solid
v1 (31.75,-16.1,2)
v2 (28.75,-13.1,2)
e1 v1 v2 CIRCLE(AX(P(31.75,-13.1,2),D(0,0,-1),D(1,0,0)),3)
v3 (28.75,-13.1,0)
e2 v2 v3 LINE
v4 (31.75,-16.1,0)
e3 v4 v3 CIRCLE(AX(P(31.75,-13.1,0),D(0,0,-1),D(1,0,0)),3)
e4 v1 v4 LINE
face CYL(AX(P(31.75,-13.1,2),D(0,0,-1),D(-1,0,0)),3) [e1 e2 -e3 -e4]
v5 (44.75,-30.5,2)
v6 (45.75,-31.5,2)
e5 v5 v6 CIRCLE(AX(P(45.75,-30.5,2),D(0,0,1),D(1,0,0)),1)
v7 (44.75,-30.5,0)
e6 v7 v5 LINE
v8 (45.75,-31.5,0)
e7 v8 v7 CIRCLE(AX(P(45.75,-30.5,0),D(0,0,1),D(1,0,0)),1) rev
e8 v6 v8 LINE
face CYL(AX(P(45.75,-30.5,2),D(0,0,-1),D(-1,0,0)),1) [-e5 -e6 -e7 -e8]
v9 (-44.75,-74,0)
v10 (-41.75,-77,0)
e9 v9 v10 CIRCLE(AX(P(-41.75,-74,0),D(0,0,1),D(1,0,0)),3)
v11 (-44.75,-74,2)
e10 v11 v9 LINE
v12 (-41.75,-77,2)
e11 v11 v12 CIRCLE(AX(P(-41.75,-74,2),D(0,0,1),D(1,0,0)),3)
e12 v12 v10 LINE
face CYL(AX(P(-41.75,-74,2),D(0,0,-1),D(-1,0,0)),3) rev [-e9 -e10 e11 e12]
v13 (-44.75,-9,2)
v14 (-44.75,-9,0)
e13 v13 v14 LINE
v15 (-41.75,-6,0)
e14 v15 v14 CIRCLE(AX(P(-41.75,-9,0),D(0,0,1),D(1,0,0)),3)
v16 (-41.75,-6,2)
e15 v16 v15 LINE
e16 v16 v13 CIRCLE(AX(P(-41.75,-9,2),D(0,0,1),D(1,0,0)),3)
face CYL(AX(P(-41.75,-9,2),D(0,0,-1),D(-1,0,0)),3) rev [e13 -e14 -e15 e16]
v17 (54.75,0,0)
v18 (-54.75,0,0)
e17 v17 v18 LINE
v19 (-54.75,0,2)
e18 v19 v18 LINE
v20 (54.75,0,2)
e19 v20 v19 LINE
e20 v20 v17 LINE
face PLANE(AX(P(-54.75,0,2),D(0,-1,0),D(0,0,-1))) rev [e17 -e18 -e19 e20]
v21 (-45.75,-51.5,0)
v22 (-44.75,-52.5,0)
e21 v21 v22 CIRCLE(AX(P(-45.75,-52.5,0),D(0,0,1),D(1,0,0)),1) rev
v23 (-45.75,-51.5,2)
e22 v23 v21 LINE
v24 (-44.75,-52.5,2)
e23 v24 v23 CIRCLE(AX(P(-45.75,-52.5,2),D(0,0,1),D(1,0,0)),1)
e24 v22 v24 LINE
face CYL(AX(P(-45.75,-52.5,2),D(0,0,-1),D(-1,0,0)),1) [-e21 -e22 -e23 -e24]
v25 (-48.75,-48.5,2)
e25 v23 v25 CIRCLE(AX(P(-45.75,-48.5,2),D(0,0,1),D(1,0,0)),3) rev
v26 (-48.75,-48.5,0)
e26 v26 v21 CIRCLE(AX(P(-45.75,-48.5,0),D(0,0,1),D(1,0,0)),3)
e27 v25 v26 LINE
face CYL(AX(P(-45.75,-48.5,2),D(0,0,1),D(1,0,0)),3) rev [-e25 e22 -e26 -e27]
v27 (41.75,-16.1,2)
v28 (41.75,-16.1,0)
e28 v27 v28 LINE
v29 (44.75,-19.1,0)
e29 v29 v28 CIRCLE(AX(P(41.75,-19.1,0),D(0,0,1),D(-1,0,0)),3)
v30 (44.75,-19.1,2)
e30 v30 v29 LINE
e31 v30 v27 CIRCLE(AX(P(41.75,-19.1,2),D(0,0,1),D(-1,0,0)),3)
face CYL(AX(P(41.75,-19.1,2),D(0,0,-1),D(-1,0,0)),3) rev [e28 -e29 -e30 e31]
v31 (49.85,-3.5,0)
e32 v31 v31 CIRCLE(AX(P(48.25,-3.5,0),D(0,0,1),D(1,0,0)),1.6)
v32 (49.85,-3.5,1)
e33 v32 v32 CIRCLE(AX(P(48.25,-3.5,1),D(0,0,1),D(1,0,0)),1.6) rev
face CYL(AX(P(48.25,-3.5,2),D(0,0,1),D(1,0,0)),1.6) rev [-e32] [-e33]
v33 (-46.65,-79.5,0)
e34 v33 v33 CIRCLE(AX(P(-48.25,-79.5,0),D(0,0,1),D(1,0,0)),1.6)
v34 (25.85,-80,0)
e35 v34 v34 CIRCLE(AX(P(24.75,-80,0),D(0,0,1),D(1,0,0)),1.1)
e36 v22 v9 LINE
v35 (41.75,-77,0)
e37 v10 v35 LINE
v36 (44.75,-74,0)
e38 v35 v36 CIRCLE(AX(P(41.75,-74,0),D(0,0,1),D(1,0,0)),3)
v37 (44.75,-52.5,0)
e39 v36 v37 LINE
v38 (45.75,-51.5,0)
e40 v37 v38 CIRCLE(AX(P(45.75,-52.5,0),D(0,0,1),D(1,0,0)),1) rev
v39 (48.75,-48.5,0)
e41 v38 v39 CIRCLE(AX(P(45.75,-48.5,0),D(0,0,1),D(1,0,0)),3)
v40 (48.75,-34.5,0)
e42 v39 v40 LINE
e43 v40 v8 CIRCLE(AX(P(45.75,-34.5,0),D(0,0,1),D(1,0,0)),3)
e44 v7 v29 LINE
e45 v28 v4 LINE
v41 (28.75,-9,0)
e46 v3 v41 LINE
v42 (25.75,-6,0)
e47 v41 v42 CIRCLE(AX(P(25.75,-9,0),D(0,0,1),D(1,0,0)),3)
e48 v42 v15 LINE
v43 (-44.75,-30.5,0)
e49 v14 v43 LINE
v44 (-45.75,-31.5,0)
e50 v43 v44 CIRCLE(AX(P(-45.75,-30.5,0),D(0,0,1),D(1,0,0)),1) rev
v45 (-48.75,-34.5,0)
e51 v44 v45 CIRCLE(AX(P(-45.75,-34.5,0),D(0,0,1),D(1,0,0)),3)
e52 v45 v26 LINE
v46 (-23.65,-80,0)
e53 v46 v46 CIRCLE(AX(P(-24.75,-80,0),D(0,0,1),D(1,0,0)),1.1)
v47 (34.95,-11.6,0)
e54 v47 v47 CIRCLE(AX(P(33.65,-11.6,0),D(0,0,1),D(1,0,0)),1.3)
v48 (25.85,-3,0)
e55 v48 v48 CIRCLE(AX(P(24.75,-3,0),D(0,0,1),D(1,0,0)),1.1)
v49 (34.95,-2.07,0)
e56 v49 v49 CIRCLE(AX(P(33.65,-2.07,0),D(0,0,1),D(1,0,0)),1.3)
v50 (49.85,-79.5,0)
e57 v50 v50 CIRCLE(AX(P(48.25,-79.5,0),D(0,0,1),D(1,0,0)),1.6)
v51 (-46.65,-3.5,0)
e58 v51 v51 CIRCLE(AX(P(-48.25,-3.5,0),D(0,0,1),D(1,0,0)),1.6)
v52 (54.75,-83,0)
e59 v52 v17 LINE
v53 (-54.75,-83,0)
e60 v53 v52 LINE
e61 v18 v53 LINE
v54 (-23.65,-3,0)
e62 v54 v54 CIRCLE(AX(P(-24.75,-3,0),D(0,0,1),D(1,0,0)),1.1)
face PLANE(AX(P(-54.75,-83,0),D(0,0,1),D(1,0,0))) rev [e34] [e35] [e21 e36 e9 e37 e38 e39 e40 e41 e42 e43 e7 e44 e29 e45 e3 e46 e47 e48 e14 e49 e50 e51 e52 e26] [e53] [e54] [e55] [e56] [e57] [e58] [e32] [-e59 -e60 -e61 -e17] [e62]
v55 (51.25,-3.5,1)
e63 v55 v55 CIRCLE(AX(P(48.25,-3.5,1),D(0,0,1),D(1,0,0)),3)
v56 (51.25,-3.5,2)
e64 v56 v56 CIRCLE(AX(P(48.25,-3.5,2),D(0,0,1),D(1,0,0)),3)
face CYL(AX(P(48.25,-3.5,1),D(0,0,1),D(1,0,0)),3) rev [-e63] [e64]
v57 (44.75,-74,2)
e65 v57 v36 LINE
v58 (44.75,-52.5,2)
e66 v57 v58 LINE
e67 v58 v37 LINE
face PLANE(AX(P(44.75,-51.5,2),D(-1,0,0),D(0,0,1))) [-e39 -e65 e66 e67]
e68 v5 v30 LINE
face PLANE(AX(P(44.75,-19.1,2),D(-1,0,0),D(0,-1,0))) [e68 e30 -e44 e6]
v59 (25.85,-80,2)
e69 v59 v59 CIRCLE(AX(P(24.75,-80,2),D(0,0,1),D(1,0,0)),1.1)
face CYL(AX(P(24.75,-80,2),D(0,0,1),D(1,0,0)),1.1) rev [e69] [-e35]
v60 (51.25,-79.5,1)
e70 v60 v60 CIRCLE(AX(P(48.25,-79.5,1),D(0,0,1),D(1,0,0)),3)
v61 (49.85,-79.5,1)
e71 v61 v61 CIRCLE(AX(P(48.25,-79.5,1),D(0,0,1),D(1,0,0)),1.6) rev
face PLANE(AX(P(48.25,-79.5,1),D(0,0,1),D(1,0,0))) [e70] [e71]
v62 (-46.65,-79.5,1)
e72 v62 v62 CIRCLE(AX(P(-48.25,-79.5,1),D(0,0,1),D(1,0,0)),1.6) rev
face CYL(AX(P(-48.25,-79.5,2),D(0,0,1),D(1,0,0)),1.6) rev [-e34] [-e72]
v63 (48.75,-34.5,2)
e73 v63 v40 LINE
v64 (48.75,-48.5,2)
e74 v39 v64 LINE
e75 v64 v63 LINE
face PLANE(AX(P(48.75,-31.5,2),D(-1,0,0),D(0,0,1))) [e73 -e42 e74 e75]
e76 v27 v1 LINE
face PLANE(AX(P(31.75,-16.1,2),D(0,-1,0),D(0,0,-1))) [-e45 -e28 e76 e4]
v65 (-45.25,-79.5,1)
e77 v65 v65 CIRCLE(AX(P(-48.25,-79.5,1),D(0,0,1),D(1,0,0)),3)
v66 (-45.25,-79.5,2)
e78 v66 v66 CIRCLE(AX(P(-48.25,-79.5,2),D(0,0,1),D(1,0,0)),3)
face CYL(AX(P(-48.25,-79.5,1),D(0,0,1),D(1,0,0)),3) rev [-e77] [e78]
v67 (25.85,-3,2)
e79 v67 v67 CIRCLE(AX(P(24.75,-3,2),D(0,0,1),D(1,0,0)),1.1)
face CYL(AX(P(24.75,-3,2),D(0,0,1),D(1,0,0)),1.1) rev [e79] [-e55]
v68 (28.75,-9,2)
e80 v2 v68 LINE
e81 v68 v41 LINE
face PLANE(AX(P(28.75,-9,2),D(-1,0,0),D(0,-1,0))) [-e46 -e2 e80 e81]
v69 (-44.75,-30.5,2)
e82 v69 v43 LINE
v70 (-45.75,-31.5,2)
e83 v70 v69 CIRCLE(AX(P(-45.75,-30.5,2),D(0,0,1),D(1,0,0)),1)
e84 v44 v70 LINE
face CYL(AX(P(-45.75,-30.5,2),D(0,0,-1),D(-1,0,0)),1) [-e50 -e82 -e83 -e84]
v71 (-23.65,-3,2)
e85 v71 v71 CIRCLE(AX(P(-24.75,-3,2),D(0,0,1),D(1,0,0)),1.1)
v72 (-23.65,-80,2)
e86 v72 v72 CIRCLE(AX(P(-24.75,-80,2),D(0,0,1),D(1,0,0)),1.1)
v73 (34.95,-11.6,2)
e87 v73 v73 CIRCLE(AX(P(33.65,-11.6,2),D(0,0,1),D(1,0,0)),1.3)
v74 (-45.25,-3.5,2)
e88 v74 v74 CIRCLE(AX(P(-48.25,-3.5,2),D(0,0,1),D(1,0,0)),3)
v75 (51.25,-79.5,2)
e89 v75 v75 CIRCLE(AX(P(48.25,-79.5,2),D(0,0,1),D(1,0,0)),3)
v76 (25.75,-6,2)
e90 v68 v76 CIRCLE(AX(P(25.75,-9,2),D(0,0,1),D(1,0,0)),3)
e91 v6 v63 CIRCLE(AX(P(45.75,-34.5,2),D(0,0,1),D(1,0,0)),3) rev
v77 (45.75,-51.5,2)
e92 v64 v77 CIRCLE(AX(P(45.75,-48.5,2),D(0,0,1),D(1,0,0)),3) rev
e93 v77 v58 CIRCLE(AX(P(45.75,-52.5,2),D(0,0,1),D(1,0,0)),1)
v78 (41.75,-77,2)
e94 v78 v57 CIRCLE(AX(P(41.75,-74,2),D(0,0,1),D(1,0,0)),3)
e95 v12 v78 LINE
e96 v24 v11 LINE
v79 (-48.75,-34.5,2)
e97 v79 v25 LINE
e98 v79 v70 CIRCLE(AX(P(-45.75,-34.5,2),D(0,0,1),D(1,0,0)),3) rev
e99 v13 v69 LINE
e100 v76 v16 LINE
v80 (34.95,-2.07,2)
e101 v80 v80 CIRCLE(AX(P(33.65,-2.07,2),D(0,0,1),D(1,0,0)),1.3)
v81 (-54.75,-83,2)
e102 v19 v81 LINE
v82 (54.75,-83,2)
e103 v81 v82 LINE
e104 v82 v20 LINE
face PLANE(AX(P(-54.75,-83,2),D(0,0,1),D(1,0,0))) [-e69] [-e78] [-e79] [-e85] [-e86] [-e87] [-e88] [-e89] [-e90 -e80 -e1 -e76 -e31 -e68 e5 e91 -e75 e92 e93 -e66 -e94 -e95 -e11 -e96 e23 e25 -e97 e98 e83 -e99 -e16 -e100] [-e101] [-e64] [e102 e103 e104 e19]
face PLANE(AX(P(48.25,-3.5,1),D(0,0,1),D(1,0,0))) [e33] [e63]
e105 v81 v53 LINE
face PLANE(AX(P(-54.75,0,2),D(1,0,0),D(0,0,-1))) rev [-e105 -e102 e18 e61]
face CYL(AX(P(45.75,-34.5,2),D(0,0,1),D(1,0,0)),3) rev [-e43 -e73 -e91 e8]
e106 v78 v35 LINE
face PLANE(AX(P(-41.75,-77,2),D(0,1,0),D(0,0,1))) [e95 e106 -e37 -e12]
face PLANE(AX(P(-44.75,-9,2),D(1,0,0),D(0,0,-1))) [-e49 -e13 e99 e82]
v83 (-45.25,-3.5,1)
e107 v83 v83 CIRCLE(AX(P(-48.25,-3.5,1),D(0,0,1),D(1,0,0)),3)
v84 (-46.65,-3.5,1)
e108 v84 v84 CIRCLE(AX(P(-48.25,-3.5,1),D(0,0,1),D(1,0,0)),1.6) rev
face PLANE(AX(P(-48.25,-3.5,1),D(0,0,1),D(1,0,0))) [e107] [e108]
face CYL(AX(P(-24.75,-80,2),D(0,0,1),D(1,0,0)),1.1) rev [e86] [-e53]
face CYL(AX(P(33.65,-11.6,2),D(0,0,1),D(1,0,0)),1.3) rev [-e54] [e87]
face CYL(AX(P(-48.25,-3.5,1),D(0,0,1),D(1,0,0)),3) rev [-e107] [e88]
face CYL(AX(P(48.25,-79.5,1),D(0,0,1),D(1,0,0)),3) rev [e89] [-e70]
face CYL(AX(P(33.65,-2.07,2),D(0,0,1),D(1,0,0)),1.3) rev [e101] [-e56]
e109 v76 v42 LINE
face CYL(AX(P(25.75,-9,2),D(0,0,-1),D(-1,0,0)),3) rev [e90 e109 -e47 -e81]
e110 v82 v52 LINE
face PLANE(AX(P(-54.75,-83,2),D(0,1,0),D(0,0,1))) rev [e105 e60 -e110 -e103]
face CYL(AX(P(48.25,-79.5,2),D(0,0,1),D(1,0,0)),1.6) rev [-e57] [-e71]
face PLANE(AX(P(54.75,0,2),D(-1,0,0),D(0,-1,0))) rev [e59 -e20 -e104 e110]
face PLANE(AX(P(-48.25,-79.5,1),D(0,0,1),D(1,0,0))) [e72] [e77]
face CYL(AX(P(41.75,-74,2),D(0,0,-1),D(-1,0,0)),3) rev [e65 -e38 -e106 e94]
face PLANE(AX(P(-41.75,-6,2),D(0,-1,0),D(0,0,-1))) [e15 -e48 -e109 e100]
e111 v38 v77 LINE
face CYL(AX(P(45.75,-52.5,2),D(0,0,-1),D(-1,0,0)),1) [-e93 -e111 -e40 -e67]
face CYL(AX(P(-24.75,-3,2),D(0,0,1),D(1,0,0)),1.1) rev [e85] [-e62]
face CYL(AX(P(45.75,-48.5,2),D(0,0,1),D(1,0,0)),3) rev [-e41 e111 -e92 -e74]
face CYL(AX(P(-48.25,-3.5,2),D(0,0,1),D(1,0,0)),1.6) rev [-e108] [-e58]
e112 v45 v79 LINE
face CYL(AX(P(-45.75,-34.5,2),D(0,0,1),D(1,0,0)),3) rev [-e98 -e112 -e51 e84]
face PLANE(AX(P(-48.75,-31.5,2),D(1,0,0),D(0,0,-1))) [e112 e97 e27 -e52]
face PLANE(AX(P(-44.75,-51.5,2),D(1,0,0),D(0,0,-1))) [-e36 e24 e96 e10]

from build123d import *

# Parameters (mm, degrees)
SKETCH1_W                  = 109.5
SKETCH1_H                  = 83
BOSS_EXTRUDE1_DEPTH        = 2
F_3_2_3_2_DIAMETER_HOLE2_D = 3.2
F_2_6_2_6_DIAMETER_HOLE2_D = 2.6
F_2_6_2_6_DIAMETER_HOLE1_D = 2.6
SKETCH9_R                  = 3
CUT_EXTRUDE1_DEPTH         = 1
F_2_2_2_2_DIAMETER_HOLE1_D = 2.2
FILLET1_R                  = 1
FILLET2_R                  = 3


with BuildPart() as part:
    # Sketch1 → Boss-Extrude1 (new body)
    with BuildSketch(Plane.XY):
        with Locations((0, -41.5)):
            Rectangle(SKETCH1_W, SKETCH1_H)
        with BuildLine():
            Line((-44.75, -31.5), (-48.75, -31.5))
            Line((-48.75, -31.5), (-48.75, -51.5))
            Line((-48.75, -51.5), (-44.75, -51.5))
            Line((-44.75, -51.5), (-44.75, -74))
            ThreePointArc((-44.75, -74), (-43.871320344, -76.121320344), (-41.75, -77))
            Line((-41.75, -77), (41.75, -77))
            ThreePointArc((41.75, -77), (43.871320344, -76.121320344), (44.75, -74))
            Line((44.75, -74), (44.75, -51.5))
            Line((44.75, -51.5), (48.75, -51.5))
            Line((48.75, -51.5), (48.75, -41.5))
            Line((48.75, -41.5), (48.75, -31.5))
            Line((48.75, -31.5), (44.75, -31.5))
            Line((44.75, -31.5), (44.75, -19.1))
            ThreePointArc((44.75, -19.1), (43.871320344, -16.978679656), (41.75, -16.1))
            Line((41.75, -16.1), (31.75, -16.1))
            ThreePointArc((31.75, -16.1), (29.628679656, -15.221320344), (28.75, -13.1))
            Line((28.75, -13.1), (28.75, -9))
            ThreePointArc((28.75, -9), (27.871320344, -6.878679656), (25.75, -6))
            Line((25.75, -6), (-41.75, -6))
            ThreePointArc((-41.75, -6), (-43.871320344, -6.878679656), (-44.75, -9))
            Line((-44.75, -9), (-44.75, -31.5))
        make_face(mode=Mode.SUBTRACT)
    extrude(amount=BOSS_EXTRUDE1_DEPTH)

    # Ø3.2 (3.2) Diameter Hole2 (through all)
    with Locations(Plane.XY.offset(2)):
        with Locations((-48.25, -3.5), (-48.25, -79.5), (48.25, -79.5), (48.25, -3.5)):
            Hole(F_3_2_3_2_DIAMETER_HOLE2_D / 2)

    # Ø2.6 (2.6) Diameter Hole2 (through all)
    with Locations(Plane.XY.offset(2)):
        with Locations((33.65, -11.6)):
            Hole(F_2_6_2_6_DIAMETER_HOLE2_D / 2)

    # Ø2.6 (2.6) Diameter Hole1 (through all)
    with Locations(Plane.XY.offset(2)):
        with Locations((33.65, -2.07)):
            Hole(F_2_6_2_6_DIAMETER_HOLE1_D / 2)

    # Sketch9 → Cut-Extrude1 (cut)
    with BuildSketch(Plane.XY.offset(2)):
        with Locations((-48.25, -3.5)):
            Circle(SKETCH9_R)
        with Locations((48.25, -3.5)):
            Circle(SKETCH9_R)
        with Locations((48.25, -79.5)):
            Circle(SKETCH9_R)
        with Locations((-48.25, -79.5)):
            Circle(SKETCH9_R)
    extrude(amount=-CUT_EXTRUDE1_DEPTH, mode=Mode.SUBTRACT)

    # Ø2.2 (2.2) Diameter Hole1 (through all)
    with Locations(Plane.XY.offset(2)):
        with Locations((-24.75, -3), (24.75, -3), (-24.75, -80), (24.75, -80)):
            Hole(F_2_2_2_2_DIAMETER_HOLE1_D / 2)

    # Fillet1
    fillet1_edges = [part.edges().sort_by_distance(p)[0] for p in [
        (-44.75, -31.5, 1),
        (-44.75, -51.5, 1),
        (44.75, -51.5, 1),
        (44.75, -31.5, 1),
    ]]
    fillet(fillet1_edges, radius=FILLET1_R)

    # Fillet2
    fillet2_edges = [part.edges().sort_by_distance(p)[0] for p in [
        (48.75, -31.5, 1),
        (48.75, -51.5, 1),
        (-48.75, -51.5, 1),
        (-48.75, -31.5, 1),
    ]]
    fillet(fillet2_edges, radius=FILLET2_R - 0.0001)  # a hair under: the kernel refuses the full size


solid = part.part
